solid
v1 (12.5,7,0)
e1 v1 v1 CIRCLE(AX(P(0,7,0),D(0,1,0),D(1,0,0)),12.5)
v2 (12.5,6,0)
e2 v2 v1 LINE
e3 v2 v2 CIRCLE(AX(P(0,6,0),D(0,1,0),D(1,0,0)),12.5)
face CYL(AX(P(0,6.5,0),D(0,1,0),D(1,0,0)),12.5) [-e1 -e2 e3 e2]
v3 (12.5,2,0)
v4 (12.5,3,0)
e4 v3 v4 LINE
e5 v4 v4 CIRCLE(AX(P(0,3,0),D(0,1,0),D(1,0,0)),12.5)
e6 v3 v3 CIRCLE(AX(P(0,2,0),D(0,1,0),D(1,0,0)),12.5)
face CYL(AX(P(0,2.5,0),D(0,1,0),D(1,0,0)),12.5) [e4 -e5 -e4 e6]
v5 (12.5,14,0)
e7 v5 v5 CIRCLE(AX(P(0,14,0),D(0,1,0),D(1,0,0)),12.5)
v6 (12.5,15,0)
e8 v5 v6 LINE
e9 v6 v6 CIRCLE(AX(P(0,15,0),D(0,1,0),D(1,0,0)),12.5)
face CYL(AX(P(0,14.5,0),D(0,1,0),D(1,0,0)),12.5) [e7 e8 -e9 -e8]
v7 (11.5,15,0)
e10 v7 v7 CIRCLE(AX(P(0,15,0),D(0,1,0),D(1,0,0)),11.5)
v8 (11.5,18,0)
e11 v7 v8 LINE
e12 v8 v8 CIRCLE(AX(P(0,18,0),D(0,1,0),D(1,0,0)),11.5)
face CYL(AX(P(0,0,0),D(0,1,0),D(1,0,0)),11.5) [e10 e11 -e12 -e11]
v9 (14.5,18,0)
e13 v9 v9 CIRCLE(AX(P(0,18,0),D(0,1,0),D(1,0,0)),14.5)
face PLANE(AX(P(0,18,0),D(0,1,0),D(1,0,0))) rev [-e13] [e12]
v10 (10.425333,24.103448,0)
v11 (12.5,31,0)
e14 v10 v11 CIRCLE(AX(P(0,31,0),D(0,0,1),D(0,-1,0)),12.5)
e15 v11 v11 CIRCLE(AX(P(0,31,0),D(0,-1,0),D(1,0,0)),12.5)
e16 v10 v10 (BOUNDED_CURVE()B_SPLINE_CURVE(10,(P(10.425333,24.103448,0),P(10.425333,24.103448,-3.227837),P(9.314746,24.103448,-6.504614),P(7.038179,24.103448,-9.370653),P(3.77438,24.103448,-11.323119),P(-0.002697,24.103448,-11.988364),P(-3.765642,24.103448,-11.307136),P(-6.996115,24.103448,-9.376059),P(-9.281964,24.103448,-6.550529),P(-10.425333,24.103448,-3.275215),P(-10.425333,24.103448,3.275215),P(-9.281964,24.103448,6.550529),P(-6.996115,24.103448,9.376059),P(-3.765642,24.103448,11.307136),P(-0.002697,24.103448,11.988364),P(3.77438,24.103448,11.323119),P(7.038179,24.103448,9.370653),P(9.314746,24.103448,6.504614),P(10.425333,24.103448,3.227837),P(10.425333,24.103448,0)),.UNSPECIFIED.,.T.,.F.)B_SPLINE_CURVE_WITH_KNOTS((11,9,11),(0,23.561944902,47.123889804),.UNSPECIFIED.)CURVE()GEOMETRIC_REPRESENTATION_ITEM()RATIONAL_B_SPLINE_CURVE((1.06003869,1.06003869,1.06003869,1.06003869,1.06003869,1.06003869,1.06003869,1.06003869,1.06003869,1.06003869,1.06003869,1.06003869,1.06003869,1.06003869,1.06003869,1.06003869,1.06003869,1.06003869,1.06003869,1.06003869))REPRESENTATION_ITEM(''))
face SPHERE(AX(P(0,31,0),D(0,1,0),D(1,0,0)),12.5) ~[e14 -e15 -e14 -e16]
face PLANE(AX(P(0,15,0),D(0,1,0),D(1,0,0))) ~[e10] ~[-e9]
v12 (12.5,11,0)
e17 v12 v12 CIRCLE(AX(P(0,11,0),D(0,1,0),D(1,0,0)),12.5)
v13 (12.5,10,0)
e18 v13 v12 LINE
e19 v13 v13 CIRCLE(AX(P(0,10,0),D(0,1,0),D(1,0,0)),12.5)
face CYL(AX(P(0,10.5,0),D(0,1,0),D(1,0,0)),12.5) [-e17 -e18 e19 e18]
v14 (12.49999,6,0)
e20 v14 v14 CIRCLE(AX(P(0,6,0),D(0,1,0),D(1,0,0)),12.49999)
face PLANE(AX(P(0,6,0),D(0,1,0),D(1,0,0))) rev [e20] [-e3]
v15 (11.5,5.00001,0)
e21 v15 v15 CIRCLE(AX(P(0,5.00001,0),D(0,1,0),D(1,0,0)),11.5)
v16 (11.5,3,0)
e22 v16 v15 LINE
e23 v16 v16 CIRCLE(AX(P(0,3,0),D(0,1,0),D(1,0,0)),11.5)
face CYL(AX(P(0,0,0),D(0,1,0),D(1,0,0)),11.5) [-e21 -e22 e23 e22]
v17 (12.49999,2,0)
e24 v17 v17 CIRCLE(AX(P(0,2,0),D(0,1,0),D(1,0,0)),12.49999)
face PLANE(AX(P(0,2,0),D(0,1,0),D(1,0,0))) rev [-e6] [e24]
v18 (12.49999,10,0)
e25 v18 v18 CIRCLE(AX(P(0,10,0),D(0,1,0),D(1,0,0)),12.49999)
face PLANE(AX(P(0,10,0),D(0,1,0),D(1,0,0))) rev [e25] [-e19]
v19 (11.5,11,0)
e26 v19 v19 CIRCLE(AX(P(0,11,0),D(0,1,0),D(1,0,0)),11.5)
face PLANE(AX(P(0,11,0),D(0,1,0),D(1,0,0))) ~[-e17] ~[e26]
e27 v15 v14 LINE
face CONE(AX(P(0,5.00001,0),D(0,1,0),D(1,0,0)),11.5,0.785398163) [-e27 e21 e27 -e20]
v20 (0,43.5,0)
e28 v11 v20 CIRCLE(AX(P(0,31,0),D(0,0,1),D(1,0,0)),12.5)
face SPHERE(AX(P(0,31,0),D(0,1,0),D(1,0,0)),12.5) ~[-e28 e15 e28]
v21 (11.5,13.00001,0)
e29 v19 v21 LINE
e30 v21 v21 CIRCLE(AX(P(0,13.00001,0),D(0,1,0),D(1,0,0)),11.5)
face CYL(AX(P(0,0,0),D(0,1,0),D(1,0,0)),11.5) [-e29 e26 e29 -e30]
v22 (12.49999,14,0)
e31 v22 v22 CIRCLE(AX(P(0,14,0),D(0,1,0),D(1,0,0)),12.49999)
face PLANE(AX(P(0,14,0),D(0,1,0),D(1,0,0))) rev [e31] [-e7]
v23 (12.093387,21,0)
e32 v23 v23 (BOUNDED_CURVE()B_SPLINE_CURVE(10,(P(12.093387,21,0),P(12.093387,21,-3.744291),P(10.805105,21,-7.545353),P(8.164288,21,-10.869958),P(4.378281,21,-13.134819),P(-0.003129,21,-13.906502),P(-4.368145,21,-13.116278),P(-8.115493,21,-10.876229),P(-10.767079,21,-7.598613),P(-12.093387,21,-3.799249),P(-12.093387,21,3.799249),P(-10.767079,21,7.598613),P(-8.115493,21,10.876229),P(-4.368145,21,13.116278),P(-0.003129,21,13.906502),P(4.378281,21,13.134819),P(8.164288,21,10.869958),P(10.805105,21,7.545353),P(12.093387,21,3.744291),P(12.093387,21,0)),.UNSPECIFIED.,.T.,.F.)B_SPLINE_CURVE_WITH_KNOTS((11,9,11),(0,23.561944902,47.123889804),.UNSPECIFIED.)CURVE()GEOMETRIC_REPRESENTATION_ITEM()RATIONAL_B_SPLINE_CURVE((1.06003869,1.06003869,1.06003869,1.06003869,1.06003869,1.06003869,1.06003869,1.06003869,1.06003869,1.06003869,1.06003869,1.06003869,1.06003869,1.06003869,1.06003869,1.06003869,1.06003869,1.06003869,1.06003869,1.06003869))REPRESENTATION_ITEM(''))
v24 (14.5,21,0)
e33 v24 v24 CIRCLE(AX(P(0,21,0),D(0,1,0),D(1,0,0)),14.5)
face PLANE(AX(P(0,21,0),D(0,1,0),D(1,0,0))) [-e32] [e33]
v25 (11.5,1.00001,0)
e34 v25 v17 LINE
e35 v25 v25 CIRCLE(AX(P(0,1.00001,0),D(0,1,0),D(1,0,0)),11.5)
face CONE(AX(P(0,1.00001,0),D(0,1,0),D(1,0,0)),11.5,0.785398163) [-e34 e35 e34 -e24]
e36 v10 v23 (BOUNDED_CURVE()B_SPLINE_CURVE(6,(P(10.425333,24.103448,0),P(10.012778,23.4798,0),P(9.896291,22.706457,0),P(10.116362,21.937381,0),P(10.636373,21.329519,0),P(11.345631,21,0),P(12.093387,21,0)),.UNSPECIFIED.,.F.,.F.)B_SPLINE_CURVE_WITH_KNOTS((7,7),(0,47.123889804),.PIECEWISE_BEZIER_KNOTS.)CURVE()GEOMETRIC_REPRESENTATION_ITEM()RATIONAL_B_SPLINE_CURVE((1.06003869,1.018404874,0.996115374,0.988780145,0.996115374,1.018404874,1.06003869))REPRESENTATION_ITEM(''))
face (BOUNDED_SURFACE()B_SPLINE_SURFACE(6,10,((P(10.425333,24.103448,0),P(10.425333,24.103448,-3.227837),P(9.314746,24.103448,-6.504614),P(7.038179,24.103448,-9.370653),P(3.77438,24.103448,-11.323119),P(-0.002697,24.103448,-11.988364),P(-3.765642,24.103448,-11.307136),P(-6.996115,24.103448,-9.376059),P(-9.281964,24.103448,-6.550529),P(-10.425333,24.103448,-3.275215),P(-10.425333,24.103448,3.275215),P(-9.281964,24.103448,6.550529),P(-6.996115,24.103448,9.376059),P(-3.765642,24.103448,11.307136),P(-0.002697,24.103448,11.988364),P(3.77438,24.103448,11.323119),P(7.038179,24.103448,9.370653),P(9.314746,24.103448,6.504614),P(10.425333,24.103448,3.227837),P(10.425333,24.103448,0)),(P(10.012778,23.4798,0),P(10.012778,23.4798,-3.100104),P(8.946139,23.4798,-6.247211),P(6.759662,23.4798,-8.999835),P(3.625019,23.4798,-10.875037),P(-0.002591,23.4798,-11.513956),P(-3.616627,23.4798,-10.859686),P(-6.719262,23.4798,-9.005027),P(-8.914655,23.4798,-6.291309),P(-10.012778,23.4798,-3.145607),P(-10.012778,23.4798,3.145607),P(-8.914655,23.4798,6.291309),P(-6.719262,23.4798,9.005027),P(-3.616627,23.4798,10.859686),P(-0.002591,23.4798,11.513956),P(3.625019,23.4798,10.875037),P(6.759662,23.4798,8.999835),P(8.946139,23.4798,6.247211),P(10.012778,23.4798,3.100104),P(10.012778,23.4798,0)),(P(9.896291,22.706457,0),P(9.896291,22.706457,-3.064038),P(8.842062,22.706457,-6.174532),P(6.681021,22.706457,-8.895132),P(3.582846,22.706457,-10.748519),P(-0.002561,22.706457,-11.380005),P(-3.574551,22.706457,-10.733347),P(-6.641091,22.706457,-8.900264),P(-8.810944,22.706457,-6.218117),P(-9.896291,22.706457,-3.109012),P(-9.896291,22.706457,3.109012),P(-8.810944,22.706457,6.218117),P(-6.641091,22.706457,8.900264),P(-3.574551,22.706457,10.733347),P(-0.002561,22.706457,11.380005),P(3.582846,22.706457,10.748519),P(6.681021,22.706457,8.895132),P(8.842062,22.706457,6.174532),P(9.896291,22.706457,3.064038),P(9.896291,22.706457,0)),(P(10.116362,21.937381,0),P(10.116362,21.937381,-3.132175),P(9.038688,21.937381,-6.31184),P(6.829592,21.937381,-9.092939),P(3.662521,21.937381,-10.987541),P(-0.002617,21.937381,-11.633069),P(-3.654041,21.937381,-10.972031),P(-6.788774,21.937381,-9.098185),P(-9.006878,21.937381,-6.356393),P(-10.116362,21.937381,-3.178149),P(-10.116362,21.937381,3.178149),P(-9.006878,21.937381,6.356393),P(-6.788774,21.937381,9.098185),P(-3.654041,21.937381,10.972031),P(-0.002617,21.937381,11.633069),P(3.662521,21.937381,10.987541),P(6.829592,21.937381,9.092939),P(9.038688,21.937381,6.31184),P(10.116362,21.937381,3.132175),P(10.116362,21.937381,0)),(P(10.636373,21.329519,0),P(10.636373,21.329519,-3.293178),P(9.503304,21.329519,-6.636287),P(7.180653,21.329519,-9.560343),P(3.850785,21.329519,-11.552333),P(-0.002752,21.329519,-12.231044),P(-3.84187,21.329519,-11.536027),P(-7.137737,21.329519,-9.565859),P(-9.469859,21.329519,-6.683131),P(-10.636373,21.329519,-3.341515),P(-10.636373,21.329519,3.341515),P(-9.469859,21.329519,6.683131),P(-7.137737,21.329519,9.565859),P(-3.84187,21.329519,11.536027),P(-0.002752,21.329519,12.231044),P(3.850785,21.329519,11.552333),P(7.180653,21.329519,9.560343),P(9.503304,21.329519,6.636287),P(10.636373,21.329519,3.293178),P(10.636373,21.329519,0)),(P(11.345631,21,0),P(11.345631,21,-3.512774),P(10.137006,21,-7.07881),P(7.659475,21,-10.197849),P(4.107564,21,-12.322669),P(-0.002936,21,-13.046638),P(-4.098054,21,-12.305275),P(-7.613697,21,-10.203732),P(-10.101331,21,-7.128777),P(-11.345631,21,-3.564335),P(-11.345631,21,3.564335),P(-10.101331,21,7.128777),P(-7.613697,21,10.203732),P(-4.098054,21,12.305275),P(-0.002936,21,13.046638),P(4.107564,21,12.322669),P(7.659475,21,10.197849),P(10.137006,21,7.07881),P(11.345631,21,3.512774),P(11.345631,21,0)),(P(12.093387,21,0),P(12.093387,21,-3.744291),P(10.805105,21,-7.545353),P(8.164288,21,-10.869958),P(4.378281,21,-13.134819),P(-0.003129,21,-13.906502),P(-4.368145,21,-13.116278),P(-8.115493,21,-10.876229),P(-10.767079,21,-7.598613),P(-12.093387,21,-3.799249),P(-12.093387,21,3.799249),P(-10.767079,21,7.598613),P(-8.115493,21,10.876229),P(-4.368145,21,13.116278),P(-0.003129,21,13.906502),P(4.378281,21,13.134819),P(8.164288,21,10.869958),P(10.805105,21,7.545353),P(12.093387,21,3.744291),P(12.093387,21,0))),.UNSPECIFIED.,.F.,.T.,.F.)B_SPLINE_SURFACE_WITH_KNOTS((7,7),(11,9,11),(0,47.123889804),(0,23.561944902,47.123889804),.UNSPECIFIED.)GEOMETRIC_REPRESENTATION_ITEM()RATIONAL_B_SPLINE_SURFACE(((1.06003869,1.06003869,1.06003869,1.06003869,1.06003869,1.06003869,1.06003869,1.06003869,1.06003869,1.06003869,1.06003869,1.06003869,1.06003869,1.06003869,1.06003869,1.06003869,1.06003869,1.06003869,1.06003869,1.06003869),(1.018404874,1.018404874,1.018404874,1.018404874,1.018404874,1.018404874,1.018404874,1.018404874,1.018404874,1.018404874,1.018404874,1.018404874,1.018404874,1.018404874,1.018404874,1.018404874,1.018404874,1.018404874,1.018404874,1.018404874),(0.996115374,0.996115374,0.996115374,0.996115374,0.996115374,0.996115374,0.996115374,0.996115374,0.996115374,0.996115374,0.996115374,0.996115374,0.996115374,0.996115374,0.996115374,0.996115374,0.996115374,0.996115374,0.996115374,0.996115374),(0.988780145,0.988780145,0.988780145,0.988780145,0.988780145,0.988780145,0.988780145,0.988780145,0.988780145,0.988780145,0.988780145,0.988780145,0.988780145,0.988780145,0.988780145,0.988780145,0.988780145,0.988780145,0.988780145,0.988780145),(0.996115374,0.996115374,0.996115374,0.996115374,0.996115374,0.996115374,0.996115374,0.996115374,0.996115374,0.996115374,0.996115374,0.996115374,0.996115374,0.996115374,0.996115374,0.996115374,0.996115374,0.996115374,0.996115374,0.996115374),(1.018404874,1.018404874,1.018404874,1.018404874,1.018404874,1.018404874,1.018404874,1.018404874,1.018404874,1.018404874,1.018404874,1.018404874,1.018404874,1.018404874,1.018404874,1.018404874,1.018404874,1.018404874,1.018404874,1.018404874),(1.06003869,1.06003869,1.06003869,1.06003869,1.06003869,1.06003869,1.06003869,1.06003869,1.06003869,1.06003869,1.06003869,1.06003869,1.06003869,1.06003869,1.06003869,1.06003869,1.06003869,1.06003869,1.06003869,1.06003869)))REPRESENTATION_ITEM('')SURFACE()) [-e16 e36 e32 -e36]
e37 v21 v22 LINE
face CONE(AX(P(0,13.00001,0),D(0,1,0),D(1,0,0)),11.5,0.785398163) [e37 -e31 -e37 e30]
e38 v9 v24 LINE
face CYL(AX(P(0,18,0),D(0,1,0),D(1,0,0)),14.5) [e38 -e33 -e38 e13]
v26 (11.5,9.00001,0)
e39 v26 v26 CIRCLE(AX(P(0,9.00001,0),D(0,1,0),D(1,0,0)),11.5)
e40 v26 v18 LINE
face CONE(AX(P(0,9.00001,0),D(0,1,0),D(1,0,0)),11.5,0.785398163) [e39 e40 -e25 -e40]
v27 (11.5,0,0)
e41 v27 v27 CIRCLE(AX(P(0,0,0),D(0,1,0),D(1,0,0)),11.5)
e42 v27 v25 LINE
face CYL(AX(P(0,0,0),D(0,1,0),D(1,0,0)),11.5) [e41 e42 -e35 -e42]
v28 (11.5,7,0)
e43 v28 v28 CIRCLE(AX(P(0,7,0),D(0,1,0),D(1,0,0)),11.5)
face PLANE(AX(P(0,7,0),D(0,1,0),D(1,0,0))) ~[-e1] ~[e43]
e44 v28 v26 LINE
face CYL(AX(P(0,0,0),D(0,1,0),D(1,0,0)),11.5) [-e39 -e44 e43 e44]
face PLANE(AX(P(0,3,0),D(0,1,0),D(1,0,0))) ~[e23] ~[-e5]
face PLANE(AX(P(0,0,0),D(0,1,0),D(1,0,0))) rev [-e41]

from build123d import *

# Parameters (mm, degrees)
F0_W    = 1
F0_H    = 1
F2_SIZE = 0.99999
F5_R    = 2


# Not quite as in the source:
# - a fillet or chamfer is up to 0.001 mm smaller than in the source, because OpenCascade refuses the exact size


with BuildPart() as f1:
    # F0 (on Top) → F1 (revolve)
    with BuildSketch(Plane.XY):
        Polygon((0, 21), (0, 0), (11.5, 0), (11.5, 2), (11.5, 3), (11.5, 6), (11.5, 7), (11.5, 10), (11.5, 11), (11.5, 14), (11.5, 15), (11.5, 18), (14.5, 18), (14.5, 21), align=None)
        with Locations((12, 14.5)):
            Rectangle(F0_W, F0_H)
        with Locations((12, 10.5)):
            Rectangle(F0_W, F0_H)
        with Locations((12, 6.5)):
            Rectangle(F0_W, F0_H)
        with Locations((12, 2.5)):
            Rectangle(F0_W, F0_H)
    revolve(axis=Axis((0, 10.5, 0), (0, 1, 0)))

    # F2 (size 1 in the source; OpenCascade refuses exactly that, so slightly less here)
    f2_edges = [f1.edges().sort_by_distance(p)[0] for p in [
        (-11.5, 2, 0),
        (-11.5, 6, 0),
        (-11.5, 10, 0),
        (-11.5, 14, 0),
    ]]
    chamfer(f2_edges, length=F2_SIZE)

    # F3 (on Top) → F4 (revolve)
    with BuildSketch(Plane.XY):
        with BuildLine():
            ThreePointArc((0, 18.5), (8.8388347648, 22.1611652352), (12.5, 31))
            ThreePointArc((12.5, 31), (8.8388347648, 39.8388347648), (0, 43.5))
            Line((0, 43.5), (0, 18.5))
        make_face()
    revolve(axis=Axis((0, 31, 0), (0, -1, 0)))

    # F5
    f5_edges = [f1.edges().sort_by_distance(p)[0] for p in [
        (-7.5, 21, 0),
    ]]
    fillet(f5_edges, radius=F5_R)


solid = f1.part
